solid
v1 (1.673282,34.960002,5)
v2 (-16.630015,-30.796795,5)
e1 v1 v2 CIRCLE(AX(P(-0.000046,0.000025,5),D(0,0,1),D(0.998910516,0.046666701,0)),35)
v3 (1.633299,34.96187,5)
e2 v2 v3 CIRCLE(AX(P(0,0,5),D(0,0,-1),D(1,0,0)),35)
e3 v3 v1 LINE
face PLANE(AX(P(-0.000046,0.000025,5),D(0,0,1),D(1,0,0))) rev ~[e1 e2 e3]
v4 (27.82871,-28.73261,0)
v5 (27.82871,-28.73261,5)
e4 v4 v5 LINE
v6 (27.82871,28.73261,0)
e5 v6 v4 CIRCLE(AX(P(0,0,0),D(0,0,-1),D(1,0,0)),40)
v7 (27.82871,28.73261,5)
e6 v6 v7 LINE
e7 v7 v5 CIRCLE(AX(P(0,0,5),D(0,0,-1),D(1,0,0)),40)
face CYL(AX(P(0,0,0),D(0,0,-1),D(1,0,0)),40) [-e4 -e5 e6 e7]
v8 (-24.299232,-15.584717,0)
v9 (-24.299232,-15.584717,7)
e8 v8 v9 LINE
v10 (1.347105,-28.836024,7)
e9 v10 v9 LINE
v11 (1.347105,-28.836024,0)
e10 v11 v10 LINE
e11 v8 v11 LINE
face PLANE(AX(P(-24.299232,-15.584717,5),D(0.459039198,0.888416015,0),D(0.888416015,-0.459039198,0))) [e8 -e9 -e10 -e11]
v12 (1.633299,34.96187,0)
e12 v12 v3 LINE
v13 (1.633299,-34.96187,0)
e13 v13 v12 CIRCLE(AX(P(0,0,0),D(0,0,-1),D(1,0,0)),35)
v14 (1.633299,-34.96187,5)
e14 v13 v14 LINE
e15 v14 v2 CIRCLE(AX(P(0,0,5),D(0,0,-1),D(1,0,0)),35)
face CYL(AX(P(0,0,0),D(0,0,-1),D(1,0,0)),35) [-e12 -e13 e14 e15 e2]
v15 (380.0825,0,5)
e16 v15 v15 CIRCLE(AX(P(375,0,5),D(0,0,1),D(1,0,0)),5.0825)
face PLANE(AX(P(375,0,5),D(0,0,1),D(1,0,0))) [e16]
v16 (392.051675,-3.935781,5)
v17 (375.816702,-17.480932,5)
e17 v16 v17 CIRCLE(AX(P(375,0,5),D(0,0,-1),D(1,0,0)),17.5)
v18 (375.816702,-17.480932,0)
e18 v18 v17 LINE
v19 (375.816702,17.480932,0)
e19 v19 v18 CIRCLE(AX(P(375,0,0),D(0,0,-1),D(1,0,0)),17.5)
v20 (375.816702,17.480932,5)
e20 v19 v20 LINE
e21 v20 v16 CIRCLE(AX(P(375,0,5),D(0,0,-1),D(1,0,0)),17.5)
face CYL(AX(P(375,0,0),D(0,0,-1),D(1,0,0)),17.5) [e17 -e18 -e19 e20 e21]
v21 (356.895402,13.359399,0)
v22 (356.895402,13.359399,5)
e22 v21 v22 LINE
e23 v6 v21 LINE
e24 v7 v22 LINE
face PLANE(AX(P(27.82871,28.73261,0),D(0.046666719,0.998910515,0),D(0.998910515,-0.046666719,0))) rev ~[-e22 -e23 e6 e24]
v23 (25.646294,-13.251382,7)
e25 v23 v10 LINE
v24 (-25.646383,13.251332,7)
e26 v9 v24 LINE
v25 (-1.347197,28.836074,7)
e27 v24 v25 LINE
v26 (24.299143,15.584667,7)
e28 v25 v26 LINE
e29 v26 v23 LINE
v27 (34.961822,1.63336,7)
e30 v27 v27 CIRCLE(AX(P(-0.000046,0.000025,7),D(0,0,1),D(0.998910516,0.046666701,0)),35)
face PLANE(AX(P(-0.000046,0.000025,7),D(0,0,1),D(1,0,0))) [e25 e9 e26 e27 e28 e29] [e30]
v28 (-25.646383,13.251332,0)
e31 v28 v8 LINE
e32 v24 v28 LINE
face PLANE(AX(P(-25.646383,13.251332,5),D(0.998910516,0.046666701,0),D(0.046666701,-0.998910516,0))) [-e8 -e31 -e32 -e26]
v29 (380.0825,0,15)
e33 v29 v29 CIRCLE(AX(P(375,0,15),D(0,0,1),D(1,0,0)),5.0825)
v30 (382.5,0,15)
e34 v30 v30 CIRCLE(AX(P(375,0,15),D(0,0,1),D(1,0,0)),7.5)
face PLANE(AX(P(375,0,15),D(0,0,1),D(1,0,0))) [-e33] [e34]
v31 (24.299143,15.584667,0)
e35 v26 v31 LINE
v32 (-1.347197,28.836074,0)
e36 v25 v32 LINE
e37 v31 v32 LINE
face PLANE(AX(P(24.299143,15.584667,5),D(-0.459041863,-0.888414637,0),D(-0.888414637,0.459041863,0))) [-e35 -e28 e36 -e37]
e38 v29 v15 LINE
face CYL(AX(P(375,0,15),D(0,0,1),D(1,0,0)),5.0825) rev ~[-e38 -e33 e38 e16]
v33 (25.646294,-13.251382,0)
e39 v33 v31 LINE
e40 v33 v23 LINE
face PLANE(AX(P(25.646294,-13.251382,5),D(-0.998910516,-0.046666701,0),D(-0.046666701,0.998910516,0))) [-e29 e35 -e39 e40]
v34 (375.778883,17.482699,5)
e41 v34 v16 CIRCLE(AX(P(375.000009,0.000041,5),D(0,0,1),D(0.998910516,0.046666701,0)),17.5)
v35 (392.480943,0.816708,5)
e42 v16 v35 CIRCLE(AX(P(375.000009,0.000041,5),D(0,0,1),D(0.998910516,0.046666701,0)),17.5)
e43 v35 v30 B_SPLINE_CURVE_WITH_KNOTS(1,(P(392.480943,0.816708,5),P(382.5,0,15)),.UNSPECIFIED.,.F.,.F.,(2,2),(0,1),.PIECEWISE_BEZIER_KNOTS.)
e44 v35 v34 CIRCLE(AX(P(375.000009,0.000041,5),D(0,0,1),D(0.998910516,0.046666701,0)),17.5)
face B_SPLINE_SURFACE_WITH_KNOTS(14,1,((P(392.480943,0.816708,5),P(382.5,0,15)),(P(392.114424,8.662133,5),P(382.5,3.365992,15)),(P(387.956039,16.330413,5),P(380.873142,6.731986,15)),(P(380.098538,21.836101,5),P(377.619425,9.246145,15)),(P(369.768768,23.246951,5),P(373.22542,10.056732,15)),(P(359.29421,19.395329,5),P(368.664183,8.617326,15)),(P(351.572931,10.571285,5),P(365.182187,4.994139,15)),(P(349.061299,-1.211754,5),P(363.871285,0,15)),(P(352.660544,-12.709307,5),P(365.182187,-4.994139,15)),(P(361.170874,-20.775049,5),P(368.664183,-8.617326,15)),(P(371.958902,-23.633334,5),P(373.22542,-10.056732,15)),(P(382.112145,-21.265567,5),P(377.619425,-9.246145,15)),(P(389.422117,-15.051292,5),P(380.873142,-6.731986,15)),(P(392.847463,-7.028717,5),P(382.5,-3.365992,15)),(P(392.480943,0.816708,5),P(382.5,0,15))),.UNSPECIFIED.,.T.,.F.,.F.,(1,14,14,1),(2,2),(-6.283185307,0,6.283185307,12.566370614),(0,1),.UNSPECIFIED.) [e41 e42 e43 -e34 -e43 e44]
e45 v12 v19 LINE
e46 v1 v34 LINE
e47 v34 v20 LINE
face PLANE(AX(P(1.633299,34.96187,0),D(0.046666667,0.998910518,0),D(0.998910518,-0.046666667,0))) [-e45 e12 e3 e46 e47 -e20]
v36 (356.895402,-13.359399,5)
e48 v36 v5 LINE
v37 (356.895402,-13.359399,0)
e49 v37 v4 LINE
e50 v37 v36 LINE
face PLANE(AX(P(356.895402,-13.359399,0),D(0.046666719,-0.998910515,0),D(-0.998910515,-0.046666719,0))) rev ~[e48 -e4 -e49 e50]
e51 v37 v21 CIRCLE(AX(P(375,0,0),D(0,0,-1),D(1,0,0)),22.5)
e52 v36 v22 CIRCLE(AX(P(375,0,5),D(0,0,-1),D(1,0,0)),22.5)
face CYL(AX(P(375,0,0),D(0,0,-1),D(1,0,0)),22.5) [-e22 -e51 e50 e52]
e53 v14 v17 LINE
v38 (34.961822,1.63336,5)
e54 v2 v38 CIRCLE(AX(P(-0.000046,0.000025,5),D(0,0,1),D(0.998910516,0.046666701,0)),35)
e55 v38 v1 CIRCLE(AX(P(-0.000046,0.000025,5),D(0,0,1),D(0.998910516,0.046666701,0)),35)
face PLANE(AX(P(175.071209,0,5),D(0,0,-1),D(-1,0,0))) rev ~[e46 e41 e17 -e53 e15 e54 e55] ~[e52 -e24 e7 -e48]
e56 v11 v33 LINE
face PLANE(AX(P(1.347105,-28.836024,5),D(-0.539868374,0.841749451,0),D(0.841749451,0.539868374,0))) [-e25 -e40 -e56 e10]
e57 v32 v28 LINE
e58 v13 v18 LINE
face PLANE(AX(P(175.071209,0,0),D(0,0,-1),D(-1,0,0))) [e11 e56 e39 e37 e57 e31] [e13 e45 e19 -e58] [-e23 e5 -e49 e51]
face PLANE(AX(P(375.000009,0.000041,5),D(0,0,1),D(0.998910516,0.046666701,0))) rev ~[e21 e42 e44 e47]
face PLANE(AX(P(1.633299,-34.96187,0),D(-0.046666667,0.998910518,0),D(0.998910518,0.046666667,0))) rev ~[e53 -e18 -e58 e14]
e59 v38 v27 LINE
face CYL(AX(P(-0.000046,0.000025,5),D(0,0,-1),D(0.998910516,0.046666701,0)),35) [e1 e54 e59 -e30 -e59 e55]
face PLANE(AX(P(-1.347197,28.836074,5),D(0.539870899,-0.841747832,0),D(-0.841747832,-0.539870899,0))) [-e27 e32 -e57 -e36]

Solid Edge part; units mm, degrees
sketch "Sketch1" plane through (0, 0, 0) normal (0, 0, 1) x (1, 0, 0)
  line L0 (1.6333, 34.9619) -> (375.8167, 17.4809)
  line L1 (1.6333, -34.9619) -> (375.8167, -17.4809)
  arc A0 (1.6333, -34.9619) -> (1.6333, 34.9619) centre (0, 0) cw
  arc A1 (375.8167, 17.4809) -> (375.8167, -17.4809) centre (375, 0) cw
extrude "Protrusion1" add sketch "Sketch1" along normal blind 5
sketch "Sketch2" plane through (178.75, 0, 5) normal (0, 0, 1) x (0.9989105, 0.0466667, 0)
  circle A0 centre (-178.5553, 8.3417) radius 35
extrude "ExtrudedProtrusion_2" add sketch "Sketch2" along normal blind 2
sketch "Sketch3" plane through (178.75, 0, 5) normal (0, 0, 1) x (0.9989105, 0.0466667, 0)
  circle A0 centre (196.0362, -9.1583) radius 17.5
sketch "Sketch4" plane through (0, 0, 15) normal (0, 0, 1) x (1, 0, 0)
  circle A0 centre (375, 0) radius 7.5
loft "LoftedProtrusion1" add profiles "Sketch3", "Sketch4"
sketch "Sketch5" plane through (178.75, 0, 5) normal (0, 0, 1) x (0.9989105, 0.0466667, 0)
  line L0 (-203.5553, 22.7754) -> (-203.5553, -6.0921)
  line L1 (-203.5553, -6.0921) -> (-178.5553, -20.5258)
  line L2 (-178.5553, -20.5258) -> (-153.5553, -6.0921)
  line L3 (-153.5553, -6.0921) -> (-153.5553, 22.7754)
  line L4 (-153.5553, 22.7754) -> (-178.5553, 37.2092)
  line L5 (-178.5553, 37.2092) -> (-203.5553, 22.7754)
extrude "ExtrudedCutout_4" cut sketch "Sketch5" along normal mid plane 70.6133
sketch "Sketch6" plane through (0, 0, 15) normal (0, 0, 1) x (1, 0, 0)
  circle A0 centre (375, 0) radius 5.0825
extrude "ExtrudedCutout_5" cut sketch "Sketch6" against normal blind 10
sketch "Sketch7" plane through (0, 0, 0) normal (0, 0, 1) x (1, 0, 0)
  line L0 (356.8954, -13.3594) -> (27.8287, -28.7326)
  line L1 (27.8287, 28.7326) -> (356.8954, 13.3594)
  arc A0 (27.8287, 28.7326) -> (27.8287, -28.7326) centre (0, 0) cw
  arc A1 (356.8954, -13.3594) -> (356.8954, 13.3594) centre (375, 0) cw
extrude "ExtrudedCutout_6" cut sketch "Sketch7" along normal blind 21.2297
